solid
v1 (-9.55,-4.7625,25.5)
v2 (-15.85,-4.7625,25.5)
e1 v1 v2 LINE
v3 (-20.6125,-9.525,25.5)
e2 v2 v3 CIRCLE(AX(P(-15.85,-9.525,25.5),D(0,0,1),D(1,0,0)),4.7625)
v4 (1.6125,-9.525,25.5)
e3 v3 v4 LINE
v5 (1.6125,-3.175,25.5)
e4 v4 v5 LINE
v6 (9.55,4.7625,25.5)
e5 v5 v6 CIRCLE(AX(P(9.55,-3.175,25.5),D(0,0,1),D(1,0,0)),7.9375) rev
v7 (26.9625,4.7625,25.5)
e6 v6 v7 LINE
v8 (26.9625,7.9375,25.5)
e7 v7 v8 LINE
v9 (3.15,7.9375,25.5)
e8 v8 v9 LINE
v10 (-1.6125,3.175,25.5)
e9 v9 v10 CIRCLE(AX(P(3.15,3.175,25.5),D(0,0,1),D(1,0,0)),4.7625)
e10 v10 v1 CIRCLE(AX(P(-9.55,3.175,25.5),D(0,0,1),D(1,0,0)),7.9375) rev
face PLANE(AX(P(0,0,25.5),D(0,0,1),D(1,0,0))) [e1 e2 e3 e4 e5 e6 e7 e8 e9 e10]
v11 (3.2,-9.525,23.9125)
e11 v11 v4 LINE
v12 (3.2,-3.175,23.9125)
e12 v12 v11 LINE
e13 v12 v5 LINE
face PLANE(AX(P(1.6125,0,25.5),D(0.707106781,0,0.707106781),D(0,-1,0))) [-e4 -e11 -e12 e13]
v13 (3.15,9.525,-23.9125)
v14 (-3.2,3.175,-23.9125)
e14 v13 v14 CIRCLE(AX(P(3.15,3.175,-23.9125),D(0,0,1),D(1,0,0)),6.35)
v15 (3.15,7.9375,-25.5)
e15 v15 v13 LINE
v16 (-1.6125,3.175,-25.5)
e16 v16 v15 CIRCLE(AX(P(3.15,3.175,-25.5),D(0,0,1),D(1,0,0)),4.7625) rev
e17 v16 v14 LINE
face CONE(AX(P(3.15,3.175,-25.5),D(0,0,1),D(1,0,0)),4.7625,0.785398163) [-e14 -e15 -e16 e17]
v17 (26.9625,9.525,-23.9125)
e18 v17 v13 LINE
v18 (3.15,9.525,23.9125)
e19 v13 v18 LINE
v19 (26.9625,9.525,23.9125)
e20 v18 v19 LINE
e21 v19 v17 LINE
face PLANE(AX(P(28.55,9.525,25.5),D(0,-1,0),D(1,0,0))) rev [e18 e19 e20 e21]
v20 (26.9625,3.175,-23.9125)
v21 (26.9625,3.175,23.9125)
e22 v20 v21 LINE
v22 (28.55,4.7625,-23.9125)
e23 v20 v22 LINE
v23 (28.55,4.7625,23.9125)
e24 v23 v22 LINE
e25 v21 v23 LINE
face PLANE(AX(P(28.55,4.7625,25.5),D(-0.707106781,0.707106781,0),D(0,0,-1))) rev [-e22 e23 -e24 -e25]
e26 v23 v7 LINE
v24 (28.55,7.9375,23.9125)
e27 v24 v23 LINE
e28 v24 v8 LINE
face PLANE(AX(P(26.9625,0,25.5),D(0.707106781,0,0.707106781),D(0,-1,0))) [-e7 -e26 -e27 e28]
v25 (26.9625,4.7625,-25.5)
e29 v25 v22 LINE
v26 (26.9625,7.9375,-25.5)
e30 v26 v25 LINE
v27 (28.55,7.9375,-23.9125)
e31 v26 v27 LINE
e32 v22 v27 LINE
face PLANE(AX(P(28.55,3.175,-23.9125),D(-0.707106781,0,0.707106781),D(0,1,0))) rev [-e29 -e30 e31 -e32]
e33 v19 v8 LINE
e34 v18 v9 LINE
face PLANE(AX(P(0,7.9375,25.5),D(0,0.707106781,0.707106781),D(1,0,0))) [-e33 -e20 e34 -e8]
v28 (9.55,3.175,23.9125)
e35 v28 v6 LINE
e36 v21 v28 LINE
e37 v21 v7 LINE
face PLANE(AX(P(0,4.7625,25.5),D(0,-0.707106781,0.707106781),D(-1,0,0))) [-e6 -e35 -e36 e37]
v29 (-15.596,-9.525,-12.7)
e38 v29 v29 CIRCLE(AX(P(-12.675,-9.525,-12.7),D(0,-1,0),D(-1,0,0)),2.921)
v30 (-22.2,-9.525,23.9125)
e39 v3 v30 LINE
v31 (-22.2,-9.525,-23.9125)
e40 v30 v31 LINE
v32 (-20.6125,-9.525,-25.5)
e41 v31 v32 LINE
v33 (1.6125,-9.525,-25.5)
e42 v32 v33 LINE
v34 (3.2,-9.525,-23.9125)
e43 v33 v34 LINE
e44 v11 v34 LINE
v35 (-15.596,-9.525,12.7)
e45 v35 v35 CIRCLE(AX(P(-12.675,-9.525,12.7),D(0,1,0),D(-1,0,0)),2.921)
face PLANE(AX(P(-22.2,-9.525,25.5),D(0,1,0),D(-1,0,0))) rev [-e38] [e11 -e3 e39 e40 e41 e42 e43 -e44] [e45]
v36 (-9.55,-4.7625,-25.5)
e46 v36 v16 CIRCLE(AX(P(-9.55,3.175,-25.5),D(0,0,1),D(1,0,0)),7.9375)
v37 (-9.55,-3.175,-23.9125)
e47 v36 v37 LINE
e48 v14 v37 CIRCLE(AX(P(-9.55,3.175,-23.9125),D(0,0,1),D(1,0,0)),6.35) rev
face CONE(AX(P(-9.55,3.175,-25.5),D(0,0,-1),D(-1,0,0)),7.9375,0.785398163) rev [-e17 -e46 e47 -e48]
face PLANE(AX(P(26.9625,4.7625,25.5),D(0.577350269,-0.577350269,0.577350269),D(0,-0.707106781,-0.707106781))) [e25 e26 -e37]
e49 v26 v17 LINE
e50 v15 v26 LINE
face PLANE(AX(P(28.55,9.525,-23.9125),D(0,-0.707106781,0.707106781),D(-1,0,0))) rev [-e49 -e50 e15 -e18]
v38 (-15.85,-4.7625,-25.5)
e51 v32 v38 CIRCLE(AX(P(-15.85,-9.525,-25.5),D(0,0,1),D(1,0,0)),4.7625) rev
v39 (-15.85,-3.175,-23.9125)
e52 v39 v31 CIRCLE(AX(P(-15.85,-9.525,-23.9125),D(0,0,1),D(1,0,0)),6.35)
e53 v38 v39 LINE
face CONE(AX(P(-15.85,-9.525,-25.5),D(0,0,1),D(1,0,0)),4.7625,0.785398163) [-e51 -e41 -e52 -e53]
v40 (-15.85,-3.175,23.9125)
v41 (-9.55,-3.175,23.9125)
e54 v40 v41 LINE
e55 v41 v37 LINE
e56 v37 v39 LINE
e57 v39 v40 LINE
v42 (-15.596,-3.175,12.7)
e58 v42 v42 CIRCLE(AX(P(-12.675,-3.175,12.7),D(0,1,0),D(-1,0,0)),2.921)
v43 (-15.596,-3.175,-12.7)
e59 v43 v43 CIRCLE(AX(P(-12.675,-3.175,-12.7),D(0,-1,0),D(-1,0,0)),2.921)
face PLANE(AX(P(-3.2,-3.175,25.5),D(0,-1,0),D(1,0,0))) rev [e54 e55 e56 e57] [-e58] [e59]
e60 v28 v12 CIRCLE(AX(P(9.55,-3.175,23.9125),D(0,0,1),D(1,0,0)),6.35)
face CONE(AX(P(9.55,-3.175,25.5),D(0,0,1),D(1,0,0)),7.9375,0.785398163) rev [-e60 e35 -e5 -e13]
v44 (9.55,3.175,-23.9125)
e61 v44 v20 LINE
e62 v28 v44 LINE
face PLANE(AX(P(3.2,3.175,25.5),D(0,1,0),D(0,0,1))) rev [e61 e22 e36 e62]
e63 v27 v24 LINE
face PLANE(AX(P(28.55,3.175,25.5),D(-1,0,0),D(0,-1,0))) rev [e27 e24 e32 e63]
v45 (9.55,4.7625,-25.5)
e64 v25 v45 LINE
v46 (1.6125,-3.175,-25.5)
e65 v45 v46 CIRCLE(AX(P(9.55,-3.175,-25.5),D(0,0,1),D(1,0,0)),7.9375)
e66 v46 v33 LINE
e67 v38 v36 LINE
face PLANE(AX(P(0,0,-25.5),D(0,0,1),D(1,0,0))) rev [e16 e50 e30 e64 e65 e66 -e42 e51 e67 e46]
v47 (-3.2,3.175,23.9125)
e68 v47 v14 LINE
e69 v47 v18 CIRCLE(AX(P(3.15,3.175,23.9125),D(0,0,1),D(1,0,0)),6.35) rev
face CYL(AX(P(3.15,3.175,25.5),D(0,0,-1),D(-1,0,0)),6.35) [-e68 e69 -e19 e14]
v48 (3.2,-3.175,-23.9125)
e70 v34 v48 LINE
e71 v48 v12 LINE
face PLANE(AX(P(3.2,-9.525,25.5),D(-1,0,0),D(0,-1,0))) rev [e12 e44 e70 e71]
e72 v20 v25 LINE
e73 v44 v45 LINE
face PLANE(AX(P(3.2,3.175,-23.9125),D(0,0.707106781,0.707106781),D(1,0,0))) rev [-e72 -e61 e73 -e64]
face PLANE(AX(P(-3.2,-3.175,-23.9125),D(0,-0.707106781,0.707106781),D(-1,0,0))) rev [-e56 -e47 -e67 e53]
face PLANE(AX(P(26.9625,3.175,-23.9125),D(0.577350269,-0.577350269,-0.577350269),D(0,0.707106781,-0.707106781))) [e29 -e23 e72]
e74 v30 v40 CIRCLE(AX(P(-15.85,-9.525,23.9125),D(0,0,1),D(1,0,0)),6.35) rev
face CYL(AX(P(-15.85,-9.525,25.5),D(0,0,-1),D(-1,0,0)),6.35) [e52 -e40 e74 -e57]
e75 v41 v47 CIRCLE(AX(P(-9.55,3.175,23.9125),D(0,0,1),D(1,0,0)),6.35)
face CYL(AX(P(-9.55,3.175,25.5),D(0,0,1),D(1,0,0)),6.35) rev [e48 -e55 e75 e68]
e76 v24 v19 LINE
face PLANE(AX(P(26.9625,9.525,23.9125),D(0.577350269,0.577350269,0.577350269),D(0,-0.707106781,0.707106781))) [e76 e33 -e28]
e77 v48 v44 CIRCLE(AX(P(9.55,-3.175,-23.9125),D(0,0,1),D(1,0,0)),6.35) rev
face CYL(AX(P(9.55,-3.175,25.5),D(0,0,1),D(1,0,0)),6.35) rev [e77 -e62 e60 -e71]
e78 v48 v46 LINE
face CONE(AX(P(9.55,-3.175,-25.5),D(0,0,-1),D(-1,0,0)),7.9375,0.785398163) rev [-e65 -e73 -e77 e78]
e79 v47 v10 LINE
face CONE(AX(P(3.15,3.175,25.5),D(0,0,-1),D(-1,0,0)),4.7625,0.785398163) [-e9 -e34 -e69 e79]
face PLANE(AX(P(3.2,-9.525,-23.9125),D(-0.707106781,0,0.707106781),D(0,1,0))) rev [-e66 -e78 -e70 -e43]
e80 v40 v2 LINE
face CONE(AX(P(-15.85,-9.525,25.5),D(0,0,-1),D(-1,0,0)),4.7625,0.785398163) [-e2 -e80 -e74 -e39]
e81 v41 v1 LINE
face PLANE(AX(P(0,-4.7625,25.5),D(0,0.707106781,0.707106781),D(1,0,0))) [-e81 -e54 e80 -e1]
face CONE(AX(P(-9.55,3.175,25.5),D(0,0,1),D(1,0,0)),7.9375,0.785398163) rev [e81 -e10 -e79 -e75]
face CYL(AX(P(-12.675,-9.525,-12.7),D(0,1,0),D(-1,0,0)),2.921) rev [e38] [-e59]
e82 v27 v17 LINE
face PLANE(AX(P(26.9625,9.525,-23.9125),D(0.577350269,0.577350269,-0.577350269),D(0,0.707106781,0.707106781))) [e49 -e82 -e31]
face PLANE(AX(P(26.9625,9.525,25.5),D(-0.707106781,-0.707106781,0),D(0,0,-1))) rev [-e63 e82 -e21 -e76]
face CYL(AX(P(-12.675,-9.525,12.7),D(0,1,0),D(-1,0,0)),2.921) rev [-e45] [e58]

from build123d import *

# Parameters (mm, degrees)
BOSS_EXTRUDE1_DEPTH = 25.5
SKETCH3_R           = 2.921
CUT_EXTRUDE1_DEPTH  = 41.331656301
FILLET1_START       = -25.5
FILLET1_DEPTH       = 51
FILLET1_2_DEPTH     = 51
CHAMFER1_SIZE       = 1.5875


with BuildPart() as part:
    # Sketch1 → Boss-Extrude1 (new, symmetric)
    with BuildSketch(Plane.XY):
        Polygon((-22.2, -9.525), (3.2, -9.525), (3.2, 3.175), (28.55, 3.175), (28.55, 9.525), (-3.2, 9.525), (-3.2, -3.175), (-22.2, -3.175), align=None)
    extrude(amount=BOSS_EXTRUDE1_DEPTH, both=True)

    # Sketch3 → Cut-Extrude1 (cut, through all)
    with BuildSketch(Plane(origin=(0, -3.175, 0), x_dir=(1, 0, 0), z_dir=(0, 1, 0))):
        with Locations(Location((-12.675, -12.7, 0), (0, 0, 180))):
            Circle(SKETCH3_R)
    cut_extrude1 = extrude(amount=-CUT_EXTRUDE1_DEPTH, mode=Mode.SUBTRACT)

    # Mirror1: Cut-Extrude1 across plane
    add(cut_extrude1.mirror(Plane.XY), mode=Mode.SUBTRACT)

    # Fillet1: read off the stored shape, not the designer's step
    # Fillet1 outline → Fillet1 (cut)
    with BuildSketch(Plane.XY.offset(FILLET1_START)):
        with BuildLine():
            Line((-22.2, -3.175), (-22.2, -9.525))
            ThreePointArc((-22.2, -9.525), (-20.340128061, -5.034871939), (-15.85, -3.175))
            Line((-15.85, -3.175), (-22.2, -3.175))
        make_face()
        with BuildLine():
            Line((-3.2, 9.525), (-3.2, 3.175))
            ThreePointArc((-3.2, 3.175), (-1.340128061, 7.665128061), (3.15, 9.525))
            Line((3.15, 9.525), (-3.2, 9.525))
        make_face()
    extrude(amount=FILLET1_DEPTH, mode=Mode.SUBTRACT)

    # Fillet1 2 outline → Fillet1 2 (add)
    with BuildSketch(Plane.XY.offset(FILLET1_START)):
        with BuildLine():
            ThreePointArc((3.2, -3.175), (5.059871939, 1.315128061), (9.55, 3.175))
            Line((9.55, 3.175), (3.2, 3.175))
            Line((3.2, 3.175), (3.2, -3.175))
        make_face()
        with BuildLine():
            ThreePointArc((-3.2, 3.175), (-5.059871939, -1.315128061), (-9.55, -3.175))
            Line((-9.55, -3.175), (-3.2, -3.175))
            Line((-3.2, -3.175), (-3.2, 3.175))
        make_face()
    extrude(amount=FILLET1_2_DEPTH)

    # Chamfer1
    chamfer1_edges = [part.edges().sort_by_distance(p)[0] for p in [
        (3.2, -6.35, -25.5),
        (3.2, -6.35, 25.5),
        (28.55, 9.525, 0),
        (28.55, 3.175, 0),
        (28.55, 6.35, 25.5),
        (15.85, 9.525, 25.5),
        (19.05, 3.175, -25.5),
        (19.05, 3.175, 25.5),
        (-12.7, -3.175, -25.5),
        (-1.340128061, 7.665128061, -25.5),
        (-20.340128061, -5.034871939, -25.5),
        (-12.7, -3.175, 25.5),
        (-1.340128061, 7.665128061, 25.5),
        (-20.340128061, -5.034871939, 25.5),
        (5.059871939, 1.315128061, -25.5),
        (5.059871939, 1.315128061, 25.5),
        (-5.059871939, -1.315128061, -25.5),
        (-5.059871939, -1.315128061, 25.5),
        (15.85, 9.525, -25.5),
        (28.55, 6.35, -25.5),
    ]]
    chamfer(chamfer1_edges, length=CHAMFER1_SIZE)


solid = part.part
